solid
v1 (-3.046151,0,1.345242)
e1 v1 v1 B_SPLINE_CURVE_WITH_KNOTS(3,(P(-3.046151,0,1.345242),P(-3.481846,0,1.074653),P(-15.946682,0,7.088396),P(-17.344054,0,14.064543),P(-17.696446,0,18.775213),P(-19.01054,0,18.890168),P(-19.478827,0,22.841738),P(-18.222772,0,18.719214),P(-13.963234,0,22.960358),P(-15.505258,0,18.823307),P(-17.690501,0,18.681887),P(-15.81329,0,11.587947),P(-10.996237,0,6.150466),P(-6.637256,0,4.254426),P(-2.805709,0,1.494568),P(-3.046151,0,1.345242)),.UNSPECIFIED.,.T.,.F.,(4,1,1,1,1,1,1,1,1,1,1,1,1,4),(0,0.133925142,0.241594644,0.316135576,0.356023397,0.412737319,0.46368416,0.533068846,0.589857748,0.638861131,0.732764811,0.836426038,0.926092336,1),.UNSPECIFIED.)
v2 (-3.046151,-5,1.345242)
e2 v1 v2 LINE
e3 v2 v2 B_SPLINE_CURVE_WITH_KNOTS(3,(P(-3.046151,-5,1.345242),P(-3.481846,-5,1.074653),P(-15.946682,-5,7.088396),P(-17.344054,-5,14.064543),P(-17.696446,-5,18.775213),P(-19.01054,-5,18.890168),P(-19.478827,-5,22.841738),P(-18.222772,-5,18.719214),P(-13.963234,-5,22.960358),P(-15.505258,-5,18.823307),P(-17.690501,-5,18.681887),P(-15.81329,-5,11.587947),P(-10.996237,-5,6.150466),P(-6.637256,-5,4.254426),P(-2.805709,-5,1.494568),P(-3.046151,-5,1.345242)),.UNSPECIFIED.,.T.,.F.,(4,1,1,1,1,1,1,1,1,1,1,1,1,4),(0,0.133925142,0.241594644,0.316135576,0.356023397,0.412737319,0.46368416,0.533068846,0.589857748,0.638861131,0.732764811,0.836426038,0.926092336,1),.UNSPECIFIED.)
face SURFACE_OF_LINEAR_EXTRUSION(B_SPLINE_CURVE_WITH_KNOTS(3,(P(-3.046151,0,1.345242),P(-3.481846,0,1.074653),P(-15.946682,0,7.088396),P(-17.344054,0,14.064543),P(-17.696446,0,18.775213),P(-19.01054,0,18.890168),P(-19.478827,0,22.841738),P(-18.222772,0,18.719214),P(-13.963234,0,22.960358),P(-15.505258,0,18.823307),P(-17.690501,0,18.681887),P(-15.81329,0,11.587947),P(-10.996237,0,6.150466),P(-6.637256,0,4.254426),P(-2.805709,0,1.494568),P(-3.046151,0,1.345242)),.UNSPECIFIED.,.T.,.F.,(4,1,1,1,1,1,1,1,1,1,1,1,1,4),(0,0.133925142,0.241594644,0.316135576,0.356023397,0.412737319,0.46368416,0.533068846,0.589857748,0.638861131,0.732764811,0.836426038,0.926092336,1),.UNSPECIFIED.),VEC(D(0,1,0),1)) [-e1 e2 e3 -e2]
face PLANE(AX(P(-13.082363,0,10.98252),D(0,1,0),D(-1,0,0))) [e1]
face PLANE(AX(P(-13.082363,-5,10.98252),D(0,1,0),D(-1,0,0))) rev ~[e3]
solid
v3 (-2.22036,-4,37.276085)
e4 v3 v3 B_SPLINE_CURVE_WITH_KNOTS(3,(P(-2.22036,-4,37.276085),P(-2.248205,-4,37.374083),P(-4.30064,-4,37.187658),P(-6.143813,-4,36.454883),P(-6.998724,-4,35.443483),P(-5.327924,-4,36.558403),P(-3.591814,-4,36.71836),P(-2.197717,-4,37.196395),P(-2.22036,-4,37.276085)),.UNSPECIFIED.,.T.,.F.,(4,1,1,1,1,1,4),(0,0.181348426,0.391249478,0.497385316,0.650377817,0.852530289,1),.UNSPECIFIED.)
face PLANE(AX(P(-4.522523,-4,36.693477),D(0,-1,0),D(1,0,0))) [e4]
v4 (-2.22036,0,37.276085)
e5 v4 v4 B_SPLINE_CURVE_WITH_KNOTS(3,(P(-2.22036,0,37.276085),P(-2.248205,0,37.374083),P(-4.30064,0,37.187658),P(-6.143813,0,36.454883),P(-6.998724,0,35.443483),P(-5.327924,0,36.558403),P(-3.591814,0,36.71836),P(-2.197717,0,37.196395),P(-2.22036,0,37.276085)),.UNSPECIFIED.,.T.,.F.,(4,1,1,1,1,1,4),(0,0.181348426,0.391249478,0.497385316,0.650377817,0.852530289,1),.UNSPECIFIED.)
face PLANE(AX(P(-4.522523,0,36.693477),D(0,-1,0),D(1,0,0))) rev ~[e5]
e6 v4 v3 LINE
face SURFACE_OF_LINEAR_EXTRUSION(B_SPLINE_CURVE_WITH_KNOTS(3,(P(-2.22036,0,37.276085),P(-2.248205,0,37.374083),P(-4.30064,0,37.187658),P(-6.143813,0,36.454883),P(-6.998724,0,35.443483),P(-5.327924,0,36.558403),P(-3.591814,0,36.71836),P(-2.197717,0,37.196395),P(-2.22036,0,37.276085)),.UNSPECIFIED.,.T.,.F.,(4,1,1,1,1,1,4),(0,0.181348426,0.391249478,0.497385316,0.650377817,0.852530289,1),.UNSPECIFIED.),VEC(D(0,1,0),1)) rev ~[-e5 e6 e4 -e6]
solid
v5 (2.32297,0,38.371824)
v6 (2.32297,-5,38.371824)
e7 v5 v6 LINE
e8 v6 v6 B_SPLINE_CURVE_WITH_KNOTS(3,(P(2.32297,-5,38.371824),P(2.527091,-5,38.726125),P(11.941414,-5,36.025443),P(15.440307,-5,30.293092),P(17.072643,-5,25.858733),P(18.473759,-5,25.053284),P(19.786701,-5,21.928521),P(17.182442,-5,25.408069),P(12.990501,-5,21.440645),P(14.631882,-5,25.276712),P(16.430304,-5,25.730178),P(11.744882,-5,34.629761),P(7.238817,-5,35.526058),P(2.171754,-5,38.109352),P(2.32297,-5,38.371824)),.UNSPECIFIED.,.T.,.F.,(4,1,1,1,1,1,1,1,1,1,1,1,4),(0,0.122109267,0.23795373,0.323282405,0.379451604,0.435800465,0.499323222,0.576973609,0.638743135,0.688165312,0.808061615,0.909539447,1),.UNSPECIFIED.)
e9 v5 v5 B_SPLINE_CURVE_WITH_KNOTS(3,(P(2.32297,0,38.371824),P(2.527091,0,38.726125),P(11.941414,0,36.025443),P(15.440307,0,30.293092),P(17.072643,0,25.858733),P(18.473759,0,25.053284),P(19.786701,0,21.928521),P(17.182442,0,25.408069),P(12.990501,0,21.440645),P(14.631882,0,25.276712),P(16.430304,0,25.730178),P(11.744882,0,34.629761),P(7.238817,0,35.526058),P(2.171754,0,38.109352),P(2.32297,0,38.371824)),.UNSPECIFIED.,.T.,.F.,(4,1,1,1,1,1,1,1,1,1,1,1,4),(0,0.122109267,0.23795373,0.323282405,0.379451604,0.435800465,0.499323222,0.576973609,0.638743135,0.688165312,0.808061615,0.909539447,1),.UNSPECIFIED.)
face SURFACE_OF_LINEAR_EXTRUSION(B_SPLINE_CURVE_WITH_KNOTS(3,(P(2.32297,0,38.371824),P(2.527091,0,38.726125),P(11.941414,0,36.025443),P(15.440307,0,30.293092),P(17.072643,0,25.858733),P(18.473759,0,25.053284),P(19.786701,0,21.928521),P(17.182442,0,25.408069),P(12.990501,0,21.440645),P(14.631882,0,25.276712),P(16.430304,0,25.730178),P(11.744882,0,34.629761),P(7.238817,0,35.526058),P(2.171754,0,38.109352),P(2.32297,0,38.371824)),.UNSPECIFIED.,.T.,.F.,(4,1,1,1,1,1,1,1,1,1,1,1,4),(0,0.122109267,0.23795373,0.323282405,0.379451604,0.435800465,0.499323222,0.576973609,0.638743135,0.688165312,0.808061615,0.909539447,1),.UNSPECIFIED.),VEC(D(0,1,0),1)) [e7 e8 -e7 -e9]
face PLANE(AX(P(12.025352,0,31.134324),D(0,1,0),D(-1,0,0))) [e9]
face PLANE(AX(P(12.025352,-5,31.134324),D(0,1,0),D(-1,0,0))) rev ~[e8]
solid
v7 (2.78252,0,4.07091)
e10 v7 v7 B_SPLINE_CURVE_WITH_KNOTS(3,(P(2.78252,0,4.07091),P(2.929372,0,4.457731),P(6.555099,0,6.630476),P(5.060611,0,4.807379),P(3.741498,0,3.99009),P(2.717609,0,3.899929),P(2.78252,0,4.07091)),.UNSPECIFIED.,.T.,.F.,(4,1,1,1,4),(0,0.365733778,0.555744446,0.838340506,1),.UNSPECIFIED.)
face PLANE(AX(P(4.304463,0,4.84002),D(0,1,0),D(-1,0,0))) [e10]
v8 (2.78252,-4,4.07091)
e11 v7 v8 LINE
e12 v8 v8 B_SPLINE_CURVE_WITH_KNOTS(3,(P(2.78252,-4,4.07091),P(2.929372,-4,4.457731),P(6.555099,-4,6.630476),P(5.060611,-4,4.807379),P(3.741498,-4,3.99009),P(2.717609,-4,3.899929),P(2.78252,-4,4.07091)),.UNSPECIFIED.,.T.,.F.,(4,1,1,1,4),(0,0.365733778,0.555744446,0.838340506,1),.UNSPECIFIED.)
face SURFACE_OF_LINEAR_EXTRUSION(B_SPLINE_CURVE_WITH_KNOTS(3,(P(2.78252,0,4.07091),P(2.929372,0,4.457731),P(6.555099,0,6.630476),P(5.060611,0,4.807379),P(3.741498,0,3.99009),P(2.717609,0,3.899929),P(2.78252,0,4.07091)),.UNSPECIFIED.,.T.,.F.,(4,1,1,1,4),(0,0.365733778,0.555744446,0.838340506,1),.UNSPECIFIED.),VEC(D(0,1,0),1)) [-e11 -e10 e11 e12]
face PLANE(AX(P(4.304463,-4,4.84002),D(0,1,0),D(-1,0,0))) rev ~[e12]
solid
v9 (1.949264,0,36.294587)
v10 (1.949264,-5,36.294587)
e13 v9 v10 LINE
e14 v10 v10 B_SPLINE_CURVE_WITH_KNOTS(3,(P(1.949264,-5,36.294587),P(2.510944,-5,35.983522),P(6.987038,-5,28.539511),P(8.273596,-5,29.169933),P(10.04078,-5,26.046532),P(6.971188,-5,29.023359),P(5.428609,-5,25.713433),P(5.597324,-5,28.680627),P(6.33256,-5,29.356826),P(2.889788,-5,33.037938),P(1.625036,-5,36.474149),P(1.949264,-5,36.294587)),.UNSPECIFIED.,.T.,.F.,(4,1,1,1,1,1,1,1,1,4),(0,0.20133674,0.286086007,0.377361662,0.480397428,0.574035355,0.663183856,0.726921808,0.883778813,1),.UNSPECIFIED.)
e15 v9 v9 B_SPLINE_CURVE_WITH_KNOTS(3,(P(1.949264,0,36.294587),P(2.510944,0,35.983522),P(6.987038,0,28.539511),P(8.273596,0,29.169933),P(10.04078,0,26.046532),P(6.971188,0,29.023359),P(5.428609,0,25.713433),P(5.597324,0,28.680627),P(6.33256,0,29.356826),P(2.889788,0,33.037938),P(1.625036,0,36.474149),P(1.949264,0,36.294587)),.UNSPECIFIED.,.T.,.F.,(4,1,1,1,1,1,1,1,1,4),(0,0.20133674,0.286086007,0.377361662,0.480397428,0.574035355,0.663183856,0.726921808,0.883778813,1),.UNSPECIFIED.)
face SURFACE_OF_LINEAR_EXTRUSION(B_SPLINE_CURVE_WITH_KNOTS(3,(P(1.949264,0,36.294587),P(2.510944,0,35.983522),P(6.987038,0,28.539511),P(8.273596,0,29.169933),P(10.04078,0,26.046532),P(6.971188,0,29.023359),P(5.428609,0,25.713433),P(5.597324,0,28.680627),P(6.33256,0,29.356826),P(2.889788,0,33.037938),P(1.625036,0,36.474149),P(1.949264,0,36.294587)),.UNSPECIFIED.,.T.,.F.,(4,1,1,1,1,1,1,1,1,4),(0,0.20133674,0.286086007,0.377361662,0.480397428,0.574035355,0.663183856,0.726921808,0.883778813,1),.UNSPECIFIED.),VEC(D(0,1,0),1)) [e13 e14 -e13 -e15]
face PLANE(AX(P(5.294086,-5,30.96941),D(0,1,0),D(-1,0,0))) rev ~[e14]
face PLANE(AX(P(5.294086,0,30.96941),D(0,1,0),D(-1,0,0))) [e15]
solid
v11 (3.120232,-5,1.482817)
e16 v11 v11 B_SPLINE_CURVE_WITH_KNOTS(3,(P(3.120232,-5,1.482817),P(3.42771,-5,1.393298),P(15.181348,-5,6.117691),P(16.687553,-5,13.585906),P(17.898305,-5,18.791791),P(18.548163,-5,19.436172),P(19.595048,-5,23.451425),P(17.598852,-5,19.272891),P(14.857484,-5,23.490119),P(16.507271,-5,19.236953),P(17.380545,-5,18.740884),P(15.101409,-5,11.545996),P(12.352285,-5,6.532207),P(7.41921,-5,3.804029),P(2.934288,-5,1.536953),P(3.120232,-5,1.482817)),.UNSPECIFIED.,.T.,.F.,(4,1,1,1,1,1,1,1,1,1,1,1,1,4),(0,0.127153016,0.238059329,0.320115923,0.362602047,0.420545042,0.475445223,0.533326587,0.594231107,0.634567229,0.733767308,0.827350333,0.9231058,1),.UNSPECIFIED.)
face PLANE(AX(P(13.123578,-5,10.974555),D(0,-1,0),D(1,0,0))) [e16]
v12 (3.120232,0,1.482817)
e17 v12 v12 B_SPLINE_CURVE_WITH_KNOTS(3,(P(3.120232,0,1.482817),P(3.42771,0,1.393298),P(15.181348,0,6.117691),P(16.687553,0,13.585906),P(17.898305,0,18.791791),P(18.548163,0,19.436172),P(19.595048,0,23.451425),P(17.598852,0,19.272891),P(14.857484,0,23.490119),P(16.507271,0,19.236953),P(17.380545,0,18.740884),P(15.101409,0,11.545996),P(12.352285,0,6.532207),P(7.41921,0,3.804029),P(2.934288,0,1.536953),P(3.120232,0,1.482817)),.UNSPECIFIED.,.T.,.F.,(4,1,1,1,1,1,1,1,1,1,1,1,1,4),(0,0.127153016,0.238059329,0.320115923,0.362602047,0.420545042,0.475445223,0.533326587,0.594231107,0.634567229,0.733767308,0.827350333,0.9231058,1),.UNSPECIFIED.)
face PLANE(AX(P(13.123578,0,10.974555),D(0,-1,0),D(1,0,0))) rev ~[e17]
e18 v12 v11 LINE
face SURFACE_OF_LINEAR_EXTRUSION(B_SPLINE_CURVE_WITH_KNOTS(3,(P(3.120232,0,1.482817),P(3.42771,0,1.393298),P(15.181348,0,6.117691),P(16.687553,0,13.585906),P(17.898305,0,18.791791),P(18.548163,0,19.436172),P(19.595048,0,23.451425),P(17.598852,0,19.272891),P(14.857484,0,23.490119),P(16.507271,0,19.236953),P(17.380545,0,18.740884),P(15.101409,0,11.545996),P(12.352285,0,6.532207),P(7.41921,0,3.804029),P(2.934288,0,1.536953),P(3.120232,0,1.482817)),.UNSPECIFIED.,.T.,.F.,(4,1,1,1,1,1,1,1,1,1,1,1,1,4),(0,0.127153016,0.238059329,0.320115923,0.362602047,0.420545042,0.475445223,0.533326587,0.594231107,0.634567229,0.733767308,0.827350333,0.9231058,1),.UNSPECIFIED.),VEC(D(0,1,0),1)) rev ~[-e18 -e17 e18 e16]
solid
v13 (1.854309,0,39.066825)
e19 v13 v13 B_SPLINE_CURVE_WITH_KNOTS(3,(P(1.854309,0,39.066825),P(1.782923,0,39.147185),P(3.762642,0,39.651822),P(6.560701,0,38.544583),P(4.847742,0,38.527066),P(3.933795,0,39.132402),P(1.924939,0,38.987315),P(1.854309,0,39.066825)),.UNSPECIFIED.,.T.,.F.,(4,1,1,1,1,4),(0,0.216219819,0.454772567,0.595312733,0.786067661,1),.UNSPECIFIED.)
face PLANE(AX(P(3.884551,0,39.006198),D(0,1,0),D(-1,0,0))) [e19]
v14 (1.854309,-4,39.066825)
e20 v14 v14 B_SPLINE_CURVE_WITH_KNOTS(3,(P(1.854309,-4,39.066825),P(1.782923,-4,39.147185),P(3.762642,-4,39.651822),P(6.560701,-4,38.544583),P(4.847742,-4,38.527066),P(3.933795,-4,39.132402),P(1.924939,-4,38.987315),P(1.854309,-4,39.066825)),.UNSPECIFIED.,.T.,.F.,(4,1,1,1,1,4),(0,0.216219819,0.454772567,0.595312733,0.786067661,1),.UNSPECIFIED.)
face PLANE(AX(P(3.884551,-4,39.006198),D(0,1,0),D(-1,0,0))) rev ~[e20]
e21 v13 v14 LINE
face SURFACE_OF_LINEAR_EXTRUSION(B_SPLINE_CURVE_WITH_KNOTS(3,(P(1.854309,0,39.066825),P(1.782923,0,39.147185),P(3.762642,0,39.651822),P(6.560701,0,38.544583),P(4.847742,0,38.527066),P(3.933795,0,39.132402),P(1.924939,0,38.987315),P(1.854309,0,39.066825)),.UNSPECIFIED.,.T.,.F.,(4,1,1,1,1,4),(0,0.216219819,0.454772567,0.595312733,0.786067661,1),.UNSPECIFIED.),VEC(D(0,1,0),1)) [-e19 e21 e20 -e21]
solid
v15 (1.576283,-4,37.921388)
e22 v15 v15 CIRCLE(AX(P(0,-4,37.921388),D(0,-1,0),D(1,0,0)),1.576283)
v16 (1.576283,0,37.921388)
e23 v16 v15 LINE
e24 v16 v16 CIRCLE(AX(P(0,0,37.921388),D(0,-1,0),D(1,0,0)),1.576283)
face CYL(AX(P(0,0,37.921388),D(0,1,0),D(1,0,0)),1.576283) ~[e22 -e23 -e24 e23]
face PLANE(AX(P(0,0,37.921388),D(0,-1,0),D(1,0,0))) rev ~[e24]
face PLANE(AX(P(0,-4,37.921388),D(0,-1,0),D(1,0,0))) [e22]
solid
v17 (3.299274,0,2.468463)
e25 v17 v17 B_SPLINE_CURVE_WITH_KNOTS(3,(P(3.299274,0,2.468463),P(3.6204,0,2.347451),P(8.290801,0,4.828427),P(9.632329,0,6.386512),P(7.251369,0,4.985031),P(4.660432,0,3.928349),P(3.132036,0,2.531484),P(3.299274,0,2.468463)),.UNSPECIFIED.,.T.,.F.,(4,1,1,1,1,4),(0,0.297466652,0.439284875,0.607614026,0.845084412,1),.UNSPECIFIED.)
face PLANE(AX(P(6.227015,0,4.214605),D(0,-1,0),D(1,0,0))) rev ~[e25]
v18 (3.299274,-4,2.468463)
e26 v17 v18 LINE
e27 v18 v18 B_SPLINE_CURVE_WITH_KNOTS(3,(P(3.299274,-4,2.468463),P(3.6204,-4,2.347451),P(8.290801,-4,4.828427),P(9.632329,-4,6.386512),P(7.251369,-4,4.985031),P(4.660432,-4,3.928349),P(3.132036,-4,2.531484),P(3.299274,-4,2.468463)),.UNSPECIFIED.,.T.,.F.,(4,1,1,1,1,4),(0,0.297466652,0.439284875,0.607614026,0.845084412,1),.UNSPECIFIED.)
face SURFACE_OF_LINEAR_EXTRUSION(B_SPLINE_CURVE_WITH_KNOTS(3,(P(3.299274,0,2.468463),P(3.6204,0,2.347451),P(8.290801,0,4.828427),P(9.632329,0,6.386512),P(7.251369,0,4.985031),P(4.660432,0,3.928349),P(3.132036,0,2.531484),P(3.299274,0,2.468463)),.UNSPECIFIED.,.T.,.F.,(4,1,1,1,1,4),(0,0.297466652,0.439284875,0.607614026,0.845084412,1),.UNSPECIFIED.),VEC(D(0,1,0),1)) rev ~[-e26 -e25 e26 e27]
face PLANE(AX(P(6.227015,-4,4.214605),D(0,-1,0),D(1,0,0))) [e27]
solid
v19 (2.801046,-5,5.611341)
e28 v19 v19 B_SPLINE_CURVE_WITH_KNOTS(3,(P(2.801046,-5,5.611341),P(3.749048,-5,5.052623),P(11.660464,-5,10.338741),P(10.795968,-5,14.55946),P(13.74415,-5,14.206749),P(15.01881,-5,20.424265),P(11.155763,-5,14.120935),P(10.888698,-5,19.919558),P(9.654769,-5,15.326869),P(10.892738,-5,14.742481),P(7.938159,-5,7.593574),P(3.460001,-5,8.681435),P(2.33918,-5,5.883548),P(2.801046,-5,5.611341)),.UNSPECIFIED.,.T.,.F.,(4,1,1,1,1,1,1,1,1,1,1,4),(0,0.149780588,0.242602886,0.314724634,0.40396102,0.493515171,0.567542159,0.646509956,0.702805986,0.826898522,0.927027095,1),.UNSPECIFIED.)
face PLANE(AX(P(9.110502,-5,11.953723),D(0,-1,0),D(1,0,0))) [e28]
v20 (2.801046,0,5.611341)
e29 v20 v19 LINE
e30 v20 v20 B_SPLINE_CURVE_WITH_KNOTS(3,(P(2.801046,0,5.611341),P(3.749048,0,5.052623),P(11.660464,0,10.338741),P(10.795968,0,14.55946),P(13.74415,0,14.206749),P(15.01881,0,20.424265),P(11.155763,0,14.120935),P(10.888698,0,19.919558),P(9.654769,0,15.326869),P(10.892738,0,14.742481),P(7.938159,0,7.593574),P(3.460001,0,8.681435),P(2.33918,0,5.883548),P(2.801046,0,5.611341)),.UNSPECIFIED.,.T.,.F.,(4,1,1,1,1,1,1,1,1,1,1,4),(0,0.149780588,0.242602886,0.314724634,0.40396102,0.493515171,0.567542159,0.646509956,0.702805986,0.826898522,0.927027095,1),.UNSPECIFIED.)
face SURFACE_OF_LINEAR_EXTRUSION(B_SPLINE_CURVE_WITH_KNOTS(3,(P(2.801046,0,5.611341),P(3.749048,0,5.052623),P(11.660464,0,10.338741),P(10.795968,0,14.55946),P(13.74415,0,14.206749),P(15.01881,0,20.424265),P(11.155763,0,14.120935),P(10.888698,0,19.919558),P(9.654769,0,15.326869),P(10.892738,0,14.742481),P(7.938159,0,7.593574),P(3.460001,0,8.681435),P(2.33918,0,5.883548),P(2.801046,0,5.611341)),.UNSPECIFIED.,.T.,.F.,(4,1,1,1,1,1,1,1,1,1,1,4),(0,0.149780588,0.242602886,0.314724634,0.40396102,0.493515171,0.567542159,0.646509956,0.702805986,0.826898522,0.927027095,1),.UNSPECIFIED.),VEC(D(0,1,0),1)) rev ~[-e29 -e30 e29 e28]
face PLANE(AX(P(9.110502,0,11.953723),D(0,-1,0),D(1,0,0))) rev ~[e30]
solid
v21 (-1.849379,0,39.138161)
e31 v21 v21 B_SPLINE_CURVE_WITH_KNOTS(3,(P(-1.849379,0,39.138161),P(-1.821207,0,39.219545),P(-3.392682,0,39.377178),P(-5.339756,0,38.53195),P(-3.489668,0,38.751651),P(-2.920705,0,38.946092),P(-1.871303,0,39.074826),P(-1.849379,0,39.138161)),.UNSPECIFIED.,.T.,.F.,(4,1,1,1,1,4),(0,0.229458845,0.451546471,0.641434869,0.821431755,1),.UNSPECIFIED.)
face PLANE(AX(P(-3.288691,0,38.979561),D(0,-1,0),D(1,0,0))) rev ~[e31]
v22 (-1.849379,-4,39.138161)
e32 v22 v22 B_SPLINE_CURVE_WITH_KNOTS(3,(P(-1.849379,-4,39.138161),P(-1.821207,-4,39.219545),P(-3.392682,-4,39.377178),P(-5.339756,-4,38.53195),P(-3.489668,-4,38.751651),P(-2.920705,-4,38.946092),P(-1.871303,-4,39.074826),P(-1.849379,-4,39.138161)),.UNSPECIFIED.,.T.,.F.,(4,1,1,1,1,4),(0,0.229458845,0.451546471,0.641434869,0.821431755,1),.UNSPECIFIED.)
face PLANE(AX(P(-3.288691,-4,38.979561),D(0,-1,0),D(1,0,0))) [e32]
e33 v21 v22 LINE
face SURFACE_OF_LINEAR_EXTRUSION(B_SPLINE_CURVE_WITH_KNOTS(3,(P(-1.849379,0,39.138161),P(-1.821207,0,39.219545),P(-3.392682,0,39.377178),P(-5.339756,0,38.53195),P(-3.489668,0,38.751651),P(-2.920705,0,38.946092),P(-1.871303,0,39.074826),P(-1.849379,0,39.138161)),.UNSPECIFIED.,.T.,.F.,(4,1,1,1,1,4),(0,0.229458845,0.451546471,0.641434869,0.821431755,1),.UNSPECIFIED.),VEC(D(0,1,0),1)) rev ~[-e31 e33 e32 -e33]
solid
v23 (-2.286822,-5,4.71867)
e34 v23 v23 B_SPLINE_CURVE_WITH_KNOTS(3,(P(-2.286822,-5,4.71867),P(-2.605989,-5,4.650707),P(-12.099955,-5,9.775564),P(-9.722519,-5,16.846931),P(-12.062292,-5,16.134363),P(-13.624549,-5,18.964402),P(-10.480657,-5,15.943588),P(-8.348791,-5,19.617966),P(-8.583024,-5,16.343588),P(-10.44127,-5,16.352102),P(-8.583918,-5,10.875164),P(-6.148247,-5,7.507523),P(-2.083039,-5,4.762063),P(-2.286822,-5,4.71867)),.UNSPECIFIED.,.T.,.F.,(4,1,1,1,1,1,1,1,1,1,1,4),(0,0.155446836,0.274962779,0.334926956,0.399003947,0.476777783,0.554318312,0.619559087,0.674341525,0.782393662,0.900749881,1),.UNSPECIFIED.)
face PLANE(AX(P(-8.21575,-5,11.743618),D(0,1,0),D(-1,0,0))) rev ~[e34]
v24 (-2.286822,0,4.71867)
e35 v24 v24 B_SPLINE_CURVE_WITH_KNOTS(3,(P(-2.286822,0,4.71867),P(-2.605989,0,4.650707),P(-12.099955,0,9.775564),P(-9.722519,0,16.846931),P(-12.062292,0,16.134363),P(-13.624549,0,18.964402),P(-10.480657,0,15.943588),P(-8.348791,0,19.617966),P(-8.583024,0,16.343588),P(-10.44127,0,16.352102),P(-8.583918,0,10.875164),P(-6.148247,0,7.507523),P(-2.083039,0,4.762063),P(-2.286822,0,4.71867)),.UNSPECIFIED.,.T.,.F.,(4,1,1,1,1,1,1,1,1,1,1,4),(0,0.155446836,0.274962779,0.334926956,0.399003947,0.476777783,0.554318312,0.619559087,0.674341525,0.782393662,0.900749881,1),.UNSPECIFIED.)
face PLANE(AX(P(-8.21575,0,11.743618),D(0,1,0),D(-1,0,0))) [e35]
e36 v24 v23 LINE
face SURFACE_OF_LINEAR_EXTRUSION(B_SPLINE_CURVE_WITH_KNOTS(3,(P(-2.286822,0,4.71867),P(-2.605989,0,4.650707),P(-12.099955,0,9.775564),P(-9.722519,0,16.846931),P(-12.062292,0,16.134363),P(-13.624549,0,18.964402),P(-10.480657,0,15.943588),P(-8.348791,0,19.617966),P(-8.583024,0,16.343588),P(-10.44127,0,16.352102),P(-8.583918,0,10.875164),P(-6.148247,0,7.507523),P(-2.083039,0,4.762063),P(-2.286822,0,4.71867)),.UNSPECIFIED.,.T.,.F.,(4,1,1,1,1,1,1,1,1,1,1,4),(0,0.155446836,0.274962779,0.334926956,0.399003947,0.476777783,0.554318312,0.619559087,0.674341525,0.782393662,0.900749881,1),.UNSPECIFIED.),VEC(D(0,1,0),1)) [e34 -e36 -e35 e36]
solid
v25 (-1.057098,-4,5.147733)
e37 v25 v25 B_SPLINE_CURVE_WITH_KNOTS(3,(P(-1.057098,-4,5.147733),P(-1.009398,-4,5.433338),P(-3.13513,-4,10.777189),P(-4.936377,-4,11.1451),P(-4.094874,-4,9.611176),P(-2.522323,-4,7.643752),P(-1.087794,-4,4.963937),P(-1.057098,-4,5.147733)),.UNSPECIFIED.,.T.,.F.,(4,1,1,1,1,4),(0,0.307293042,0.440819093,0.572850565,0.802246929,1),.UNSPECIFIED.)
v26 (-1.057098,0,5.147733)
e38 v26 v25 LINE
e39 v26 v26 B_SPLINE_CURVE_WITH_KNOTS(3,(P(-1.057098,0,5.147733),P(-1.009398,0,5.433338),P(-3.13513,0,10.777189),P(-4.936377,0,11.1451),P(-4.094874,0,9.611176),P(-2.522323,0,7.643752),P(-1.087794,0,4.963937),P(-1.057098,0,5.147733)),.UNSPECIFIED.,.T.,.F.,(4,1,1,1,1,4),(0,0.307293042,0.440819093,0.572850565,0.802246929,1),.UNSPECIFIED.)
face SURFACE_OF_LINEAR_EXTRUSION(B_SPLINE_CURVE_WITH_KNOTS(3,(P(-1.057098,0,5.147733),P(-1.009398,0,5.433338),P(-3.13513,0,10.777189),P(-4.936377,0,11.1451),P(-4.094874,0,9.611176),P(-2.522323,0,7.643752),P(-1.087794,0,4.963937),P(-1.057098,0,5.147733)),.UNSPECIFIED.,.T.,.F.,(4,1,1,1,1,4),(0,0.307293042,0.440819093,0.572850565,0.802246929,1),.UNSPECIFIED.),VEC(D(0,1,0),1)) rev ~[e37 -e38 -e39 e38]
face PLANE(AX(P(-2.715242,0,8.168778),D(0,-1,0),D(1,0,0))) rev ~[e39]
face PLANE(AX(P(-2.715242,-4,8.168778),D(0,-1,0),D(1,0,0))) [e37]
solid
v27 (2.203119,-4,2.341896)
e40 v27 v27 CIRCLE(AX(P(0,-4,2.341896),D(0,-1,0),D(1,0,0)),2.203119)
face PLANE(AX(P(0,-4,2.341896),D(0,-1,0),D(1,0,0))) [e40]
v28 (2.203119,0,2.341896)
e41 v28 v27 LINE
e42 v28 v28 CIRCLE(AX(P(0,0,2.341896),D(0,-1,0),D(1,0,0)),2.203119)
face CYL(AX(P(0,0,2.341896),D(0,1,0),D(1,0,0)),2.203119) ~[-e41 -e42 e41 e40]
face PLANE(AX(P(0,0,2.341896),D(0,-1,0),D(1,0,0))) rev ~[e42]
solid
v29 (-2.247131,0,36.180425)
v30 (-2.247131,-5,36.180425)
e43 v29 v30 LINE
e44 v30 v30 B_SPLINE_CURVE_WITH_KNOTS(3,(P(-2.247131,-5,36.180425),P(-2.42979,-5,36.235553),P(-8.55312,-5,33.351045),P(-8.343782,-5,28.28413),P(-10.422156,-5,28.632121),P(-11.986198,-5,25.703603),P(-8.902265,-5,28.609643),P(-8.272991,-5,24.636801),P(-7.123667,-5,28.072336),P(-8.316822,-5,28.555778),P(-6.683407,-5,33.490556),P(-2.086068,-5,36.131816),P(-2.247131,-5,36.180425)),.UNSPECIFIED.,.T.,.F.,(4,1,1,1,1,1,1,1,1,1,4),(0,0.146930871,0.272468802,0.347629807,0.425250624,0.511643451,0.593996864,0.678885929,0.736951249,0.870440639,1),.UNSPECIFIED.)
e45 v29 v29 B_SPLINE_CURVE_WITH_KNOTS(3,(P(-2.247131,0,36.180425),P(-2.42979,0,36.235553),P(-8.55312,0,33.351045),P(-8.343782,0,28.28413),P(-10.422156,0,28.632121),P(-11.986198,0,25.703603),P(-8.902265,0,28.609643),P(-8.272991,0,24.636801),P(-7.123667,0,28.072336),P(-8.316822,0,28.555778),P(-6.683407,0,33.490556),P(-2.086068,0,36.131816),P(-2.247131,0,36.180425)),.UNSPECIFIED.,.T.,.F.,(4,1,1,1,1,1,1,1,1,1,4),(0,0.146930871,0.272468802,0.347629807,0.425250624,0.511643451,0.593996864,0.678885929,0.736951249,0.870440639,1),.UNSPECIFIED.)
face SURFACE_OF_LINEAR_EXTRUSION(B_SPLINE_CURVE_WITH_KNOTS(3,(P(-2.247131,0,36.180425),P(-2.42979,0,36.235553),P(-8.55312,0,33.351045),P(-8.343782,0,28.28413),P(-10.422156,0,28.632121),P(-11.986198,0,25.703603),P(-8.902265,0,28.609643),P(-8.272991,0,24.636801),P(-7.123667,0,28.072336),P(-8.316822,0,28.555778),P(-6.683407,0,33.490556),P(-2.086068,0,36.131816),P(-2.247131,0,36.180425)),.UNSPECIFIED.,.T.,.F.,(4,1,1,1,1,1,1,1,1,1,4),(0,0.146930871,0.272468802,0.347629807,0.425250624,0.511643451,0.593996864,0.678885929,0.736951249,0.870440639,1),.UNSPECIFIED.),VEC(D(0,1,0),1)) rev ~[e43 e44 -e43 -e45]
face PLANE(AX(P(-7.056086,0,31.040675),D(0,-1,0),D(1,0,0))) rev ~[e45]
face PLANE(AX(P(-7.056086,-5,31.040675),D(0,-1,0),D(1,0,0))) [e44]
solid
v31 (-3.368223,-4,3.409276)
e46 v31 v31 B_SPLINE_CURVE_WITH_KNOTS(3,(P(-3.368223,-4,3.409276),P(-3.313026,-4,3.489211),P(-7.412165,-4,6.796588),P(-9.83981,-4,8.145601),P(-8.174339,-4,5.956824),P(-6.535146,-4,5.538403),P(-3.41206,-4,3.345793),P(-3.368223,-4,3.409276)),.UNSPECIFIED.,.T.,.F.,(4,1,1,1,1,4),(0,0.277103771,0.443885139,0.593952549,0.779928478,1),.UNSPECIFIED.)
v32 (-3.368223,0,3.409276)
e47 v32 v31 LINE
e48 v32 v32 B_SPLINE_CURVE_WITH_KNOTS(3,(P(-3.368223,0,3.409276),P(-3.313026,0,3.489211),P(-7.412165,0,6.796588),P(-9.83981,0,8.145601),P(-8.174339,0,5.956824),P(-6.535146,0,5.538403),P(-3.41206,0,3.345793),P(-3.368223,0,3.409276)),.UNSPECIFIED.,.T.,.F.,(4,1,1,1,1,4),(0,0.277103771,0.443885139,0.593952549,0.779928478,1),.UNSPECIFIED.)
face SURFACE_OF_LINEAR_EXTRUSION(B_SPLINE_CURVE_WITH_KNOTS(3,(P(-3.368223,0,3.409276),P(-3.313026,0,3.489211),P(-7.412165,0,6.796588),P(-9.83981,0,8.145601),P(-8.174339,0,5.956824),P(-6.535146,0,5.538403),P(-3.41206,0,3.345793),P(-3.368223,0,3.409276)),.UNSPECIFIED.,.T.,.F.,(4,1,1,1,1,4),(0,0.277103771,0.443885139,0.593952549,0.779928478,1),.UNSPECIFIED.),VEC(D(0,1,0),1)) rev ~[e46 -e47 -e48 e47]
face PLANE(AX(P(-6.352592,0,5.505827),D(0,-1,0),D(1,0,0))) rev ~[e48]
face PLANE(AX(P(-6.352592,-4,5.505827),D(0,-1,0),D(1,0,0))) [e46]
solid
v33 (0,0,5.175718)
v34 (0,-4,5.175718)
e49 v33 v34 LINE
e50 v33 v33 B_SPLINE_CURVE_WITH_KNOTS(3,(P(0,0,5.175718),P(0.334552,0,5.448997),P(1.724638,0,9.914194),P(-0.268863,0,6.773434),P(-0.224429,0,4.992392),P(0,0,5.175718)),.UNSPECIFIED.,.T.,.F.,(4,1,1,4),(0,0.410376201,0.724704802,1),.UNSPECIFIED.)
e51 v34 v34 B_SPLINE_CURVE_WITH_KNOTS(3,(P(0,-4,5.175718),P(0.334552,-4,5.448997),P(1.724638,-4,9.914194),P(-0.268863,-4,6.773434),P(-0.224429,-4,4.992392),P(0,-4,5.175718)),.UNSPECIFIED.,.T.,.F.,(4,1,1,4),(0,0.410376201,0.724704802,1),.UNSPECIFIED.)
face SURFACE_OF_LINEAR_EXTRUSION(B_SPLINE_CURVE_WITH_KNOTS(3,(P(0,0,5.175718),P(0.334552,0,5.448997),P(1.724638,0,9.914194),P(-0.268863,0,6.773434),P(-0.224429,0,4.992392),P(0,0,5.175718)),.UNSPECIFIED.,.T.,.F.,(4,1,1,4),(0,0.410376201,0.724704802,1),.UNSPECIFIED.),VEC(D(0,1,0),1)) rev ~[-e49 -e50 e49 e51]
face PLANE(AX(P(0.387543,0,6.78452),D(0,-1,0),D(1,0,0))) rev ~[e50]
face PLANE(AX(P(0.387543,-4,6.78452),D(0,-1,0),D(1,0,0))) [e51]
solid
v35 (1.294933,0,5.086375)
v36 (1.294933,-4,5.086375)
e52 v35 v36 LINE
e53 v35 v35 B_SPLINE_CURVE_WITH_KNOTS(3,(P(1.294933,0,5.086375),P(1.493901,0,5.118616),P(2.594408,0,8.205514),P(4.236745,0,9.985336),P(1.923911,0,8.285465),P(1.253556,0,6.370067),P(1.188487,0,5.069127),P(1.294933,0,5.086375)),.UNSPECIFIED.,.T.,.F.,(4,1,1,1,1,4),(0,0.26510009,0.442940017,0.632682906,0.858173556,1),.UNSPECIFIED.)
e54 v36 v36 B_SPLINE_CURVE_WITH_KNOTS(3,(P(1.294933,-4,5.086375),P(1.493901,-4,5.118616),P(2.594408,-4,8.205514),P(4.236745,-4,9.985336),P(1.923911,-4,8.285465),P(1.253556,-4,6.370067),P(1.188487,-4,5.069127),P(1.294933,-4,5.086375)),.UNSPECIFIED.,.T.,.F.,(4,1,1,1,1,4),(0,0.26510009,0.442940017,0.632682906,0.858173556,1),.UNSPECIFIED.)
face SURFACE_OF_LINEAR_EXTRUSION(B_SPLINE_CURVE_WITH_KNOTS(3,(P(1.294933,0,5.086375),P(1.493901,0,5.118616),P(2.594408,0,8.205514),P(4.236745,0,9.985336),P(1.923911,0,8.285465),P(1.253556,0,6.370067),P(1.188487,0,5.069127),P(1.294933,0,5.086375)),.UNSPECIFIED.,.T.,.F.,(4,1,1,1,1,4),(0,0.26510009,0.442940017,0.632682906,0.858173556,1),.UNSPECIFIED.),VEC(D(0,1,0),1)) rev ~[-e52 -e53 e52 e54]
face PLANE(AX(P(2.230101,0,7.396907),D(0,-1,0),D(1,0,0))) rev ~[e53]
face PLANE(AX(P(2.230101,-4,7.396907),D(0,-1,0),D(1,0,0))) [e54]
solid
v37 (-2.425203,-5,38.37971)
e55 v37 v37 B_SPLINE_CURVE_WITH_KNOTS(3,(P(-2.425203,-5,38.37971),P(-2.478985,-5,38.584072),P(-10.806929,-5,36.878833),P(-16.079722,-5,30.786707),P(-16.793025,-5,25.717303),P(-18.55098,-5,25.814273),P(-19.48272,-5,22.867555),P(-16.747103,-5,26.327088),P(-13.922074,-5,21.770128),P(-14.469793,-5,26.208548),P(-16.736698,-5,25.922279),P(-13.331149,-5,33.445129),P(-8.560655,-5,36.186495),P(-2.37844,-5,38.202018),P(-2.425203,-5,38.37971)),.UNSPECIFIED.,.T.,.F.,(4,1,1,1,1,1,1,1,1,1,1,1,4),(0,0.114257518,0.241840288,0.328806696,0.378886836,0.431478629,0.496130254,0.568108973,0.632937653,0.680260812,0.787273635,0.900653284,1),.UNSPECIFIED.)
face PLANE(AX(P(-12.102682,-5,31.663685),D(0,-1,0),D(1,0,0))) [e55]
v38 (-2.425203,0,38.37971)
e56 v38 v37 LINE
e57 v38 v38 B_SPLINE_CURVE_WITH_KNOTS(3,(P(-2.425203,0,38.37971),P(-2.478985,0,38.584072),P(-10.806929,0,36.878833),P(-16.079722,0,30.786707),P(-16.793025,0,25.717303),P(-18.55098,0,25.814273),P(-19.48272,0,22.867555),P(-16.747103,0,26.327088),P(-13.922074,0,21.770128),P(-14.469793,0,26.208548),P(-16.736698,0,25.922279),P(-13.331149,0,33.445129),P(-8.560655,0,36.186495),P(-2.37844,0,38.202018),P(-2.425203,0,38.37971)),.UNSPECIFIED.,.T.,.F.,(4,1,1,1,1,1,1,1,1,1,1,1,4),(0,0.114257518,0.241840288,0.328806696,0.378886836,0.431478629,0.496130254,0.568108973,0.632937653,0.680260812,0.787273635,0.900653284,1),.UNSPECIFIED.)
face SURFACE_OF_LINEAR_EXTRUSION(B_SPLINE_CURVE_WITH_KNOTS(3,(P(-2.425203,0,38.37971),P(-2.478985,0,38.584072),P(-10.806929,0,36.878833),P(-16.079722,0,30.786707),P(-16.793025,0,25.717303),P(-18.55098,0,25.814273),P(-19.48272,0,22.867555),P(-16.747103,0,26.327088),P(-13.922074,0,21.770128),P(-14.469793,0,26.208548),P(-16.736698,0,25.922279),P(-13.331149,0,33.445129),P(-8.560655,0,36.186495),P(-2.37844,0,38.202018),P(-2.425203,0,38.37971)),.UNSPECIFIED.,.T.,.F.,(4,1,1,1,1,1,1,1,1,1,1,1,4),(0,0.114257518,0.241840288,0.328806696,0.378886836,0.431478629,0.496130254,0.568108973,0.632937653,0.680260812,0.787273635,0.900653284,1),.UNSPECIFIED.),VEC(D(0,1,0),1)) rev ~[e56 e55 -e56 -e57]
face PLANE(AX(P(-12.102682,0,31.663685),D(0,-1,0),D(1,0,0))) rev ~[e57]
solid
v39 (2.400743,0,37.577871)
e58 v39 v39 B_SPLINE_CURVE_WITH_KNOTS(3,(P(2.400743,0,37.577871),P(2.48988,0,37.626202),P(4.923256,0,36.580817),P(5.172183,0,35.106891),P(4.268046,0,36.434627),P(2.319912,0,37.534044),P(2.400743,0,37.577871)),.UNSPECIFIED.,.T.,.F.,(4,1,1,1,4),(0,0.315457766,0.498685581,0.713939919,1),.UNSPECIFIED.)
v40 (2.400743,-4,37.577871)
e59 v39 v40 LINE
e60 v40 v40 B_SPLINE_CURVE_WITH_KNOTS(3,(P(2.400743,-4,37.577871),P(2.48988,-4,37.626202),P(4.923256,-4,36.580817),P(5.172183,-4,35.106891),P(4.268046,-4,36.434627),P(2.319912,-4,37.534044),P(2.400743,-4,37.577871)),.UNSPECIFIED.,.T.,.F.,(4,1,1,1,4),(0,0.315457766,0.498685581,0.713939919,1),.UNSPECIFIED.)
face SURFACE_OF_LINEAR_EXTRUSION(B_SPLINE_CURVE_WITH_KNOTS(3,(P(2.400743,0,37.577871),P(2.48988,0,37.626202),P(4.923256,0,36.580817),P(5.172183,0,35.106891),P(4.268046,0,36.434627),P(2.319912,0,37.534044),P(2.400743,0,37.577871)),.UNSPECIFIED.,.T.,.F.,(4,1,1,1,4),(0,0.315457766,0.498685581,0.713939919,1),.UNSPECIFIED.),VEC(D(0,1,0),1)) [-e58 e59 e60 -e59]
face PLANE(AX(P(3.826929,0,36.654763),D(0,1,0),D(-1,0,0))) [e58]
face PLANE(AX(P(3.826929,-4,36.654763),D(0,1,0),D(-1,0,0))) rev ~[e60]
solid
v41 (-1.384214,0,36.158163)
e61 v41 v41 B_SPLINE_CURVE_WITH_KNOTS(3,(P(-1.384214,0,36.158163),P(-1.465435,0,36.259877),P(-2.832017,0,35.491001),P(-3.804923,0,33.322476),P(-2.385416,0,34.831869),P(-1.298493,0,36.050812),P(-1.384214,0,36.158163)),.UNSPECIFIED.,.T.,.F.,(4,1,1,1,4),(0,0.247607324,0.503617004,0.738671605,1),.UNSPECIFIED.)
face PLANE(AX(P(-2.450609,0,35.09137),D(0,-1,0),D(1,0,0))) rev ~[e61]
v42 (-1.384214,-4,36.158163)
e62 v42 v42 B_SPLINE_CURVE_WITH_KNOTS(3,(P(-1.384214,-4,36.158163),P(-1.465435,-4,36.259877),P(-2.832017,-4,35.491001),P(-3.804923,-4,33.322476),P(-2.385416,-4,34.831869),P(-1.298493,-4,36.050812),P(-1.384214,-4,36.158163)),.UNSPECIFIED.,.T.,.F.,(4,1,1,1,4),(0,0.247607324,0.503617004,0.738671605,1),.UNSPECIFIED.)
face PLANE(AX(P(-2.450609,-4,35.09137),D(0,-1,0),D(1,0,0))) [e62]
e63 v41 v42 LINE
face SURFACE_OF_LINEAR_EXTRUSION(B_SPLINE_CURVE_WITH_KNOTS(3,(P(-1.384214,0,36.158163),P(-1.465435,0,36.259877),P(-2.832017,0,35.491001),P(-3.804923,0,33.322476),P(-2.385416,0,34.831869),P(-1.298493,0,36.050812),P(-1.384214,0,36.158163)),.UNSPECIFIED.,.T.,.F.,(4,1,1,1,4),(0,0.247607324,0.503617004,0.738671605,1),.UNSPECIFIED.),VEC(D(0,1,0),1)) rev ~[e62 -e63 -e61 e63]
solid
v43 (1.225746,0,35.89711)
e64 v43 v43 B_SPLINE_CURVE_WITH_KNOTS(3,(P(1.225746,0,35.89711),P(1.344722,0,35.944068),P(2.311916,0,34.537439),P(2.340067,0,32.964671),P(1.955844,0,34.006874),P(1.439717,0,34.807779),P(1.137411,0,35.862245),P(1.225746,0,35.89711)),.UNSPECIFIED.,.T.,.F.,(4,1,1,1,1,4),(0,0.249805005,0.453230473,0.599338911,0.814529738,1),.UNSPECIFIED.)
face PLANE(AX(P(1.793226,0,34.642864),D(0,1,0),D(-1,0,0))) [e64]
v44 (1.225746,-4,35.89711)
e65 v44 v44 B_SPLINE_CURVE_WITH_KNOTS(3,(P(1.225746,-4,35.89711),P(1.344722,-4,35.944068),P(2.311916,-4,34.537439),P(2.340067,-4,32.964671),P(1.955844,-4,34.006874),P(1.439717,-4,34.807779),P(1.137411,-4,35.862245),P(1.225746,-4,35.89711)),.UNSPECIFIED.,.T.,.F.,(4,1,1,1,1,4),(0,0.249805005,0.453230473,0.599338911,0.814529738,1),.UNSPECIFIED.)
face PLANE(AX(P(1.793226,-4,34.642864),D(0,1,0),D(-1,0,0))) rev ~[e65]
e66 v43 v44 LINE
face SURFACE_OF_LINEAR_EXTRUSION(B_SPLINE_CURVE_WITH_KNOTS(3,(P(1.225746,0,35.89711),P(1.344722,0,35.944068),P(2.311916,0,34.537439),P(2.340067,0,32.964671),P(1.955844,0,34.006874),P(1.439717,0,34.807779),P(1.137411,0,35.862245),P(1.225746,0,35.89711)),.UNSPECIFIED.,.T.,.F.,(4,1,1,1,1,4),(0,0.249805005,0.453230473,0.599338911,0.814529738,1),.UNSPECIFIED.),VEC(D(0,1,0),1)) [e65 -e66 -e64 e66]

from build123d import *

# Parameters (mm, degrees)
F3_R      = 2.2031193739
F4_DEPTH  = 4
F5_R      = 1.5762828789
F6_DEPTH  = 4
F8_DEPTH  = 5
F13_DEPTH = 5
F14_DEPTH = 5
F15_DEPTH = 5
F19_DEPTH = 5
F20_DEPTH = 5
F21_DEPTH = 5
F22_DEPTH = 5
F29_DEPTH = 4
F30_DEPTH = 4
F31_DEPTH = 4
F32_DEPTH = 4
F33_DEPTH = 4
F34_DEPTH = 4
F39_DEPTH = 4
F40_DEPTH = 4
F41_DEPTH = 4
F42_DEPTH = 4
F45_DEPTH = 4
F46_DEPTH = 4


# Not quite as in the source:
# - the program builds the solid bodies; features that only make, move or delete a surface that nothing else refers to are left out


with BuildPart() as f4:
    # F3 (on Front) → F4 (new body)
    with BuildSketch(Plane.XZ):
        with Locations((0, 2.3418962955)):
            Circle(F3_R)
    extrude(amount=F4_DEPTH)


with BuildPart() as f6:
    # F5 (on Front) → F6 (new body)
    with BuildSketch(Plane.XZ):
        with Locations((0, 37.9213877022)):
            Circle(F5_R)
    extrude(amount=F6_DEPTH)


with BuildPart() as f8:
    # F7 (on Front) → F8 (new body)
    with BuildSketch(Plane.XZ):
        with BuildLine():
            add(Edge.make_bspline(
                [(2.8010457754, 5.6113414466), (3.7490480342, 5.0526232335), (11.660464427, 10.3387411352), (10.7959679961, 14.559460332), (13.7441495824, 14.2067494477), (15.0188095178, 20.4242651347), (11.155763458, 14.1209353977), (10.8886984205, 19.9195584963), (9.6547685549, 15.3268691163), (10.8927378391, 14.7424811012), (7.938159407, 7.593573555), (3.4600012996, 8.6814348962), (2.339180326, 5.8835482227), (2.8010457754, 5.6113414466)],
                knots=[0, 0, 0, 0, 0.1497805879, 0.2426028863, 0.3147246339, 0.4039610203, 0.4935151706, 0.5675421593, 0.6465099561, 0.7028059861, 0.826898522, 0.9270270952, 1, 1, 1, 1], degree=3))
        make_face()
    extrude(amount=F8_DEPTH)


with BuildPart() as f13:
    # F10 (on Front) → F13 (new body)
    with BuildSketch(Plane.XZ):
        with BuildLine():
            add(Edge.make_bspline(
                [(-3.0461507849, 1.3452416752), (-3.4818464728, 1.0746526722), (-15.9466824959, 7.0883957863), (-17.3440535719, 14.0645430033), (-17.6964457302, 18.7752133758), (-19.0105397095, 18.8901683902), (-19.4788265599, 22.8417380605), (-18.2227719071, 18.7192140814), (-13.9632338729, 22.9603577053), (-15.5052584544, 18.8233068375), (-17.6905007654, 18.6818873374), (-15.8132900001, 11.5879474918), (-10.9962366401, 6.1504658227), (-6.6372556078, 4.254425972), (-2.8057086264, 1.4945683859), (-3.0461507849, 1.3452416752)],
                knots=[0, 0, 0, 0, 0.1339251424, 0.241594644, 0.3161355758, 0.3560233968, 0.412737319, 0.4636841603, 0.5330688457, 0.5898577481, 0.638861131, 0.7327648109, 0.8364260377, 0.9260923364, 1, 1, 1, 1], degree=3))
        make_face()
    extrude(amount=F13_DEPTH)


with BuildPart() as f14:
    # F11 (on Front) → F14 (new body)
    with BuildSketch(Plane.XZ):
        with BuildLine():
            add(Edge.make_bspline(
                [(-2.2868220694, 4.7186701559), (-2.6059892866, 4.6507073984), (-12.0999546825, 9.7755638468), (-9.7225185843, 16.8469305379), (-12.0622915375, 16.1343630453), (-13.6245494081, 18.964401828), (-10.4806569975, 15.9435882622), (-8.3487910491, 19.617965915), (-8.5830237681, 16.343588236), (-10.4412698192, 16.3521021675), (-8.5839180053, 10.8751642204), (-6.1482469705, 7.5075225049), (-2.0830393164, 4.7620632021), (-2.2868220694, 4.7186701559)],
                knots=[0, 0, 0, 0, 0.1554468363, 0.2749627788, 0.3349269565, 0.3990039473, 0.4767777833, 0.5543183117, 0.6195590867, 0.6743415246, 0.7823936617, 0.9007498811, 1, 1, 1, 1], degree=3))
        make_face()
    extrude(amount=F14_DEPTH)


with BuildPart() as f15:
    # F12 (on Front) → F15 (new body)
    with BuildSketch(Plane.XZ):
        with BuildLine():
            add(Edge.make_bspline(
                [(3.1202319078, 1.4828173444), (3.4277099811, 1.3932976165), (15.1813481771, 6.1176914834), (16.6875533637, 13.5859063631), (17.8983054266, 18.7917910272), (18.5481634415, 19.4361719166), (19.5950481907, 23.4514253732), (17.598851761, 19.2728908312), (14.8574838152, 23.4901190525), (16.5072711493, 19.2369526839), (17.3805448102, 18.7408839057), (15.1014088235, 11.5459960258), (12.3522853152, 6.5322070241), (7.4192099097, 3.8040285678), (2.9342883779, 1.5369532833), (3.1202319078, 1.4828173444)],
                knots=[0, 0, 0, 0, 0.1271530156, 0.2380593294, 0.3201159226, 0.3626020469, 0.4205450423, 0.4754452226, 0.533326587, 0.5942311074, 0.6345672285, 0.7337673076, 0.8273503335, 0.9231057997, 1, 1, 1, 1], degree=3))
        make_face()
    extrude(amount=F15_DEPTH)


with BuildPart() as f19:
    # F18 (on Front) → F19 (new body)
    with BuildSketch(Plane.XZ):
        with BuildLine():
            add(Edge.make_bspline(
                [(2.322970191, 38.3718237281), (2.5270910425, 38.7261250095), (11.9414135575, 36.0254427021), (15.4403073522, 30.293092001), (17.0726428574, 25.8587327004), (18.4737587842, 25.0532840335), (19.7867006527, 21.928521176), (17.1824421043, 25.4080690427), (12.990501005, 21.4406454045), (14.6318823595, 25.2767119865), (16.4303038149, 25.7301784196), (11.7448821367, 34.6297607631), (7.2388170198, 35.5260575644), (2.1717541082, 38.1093515136), (2.322970191, 38.3718237281)],
                knots=[0, 0, 0, 0, 0.1221092671, 0.2379537302, 0.323282405, 0.3794516036, 0.4358004654, 0.4993232222, 0.5769736094, 0.6387431351, 0.688165312, 0.8080616155, 0.9095394473, 1, 1, 1, 1], degree=3))
        make_face()
    extrude(amount=F19_DEPTH)


with BuildPart() as f20:
    # F17 (on Front) → F20 (new body)
    with BuildSketch(Plane.XZ):
        with BuildLine():
            add(Edge.make_bspline(
                [(1.9492642023, 36.2945869565), (2.5109444115, 35.9835217607), (6.9870378528, 28.5395111667), (8.2735961106, 29.1699334606), (10.0407799206, 26.0465320892), (6.971187526, 29.0233585074), (5.4286092857, 25.7134326681), (5.5973243084, 28.6806268497), (6.3325602319, 29.3568256566), (2.8897882043, 33.0379384873), (1.6250355459, 36.4741486516), (1.9492642023, 36.2945869565)],
                knots=[0, 0, 0, 0, 0.2013367397, 0.2860860069, 0.3773616619, 0.480397428, 0.5740353547, 0.6631838563, 0.7269218084, 0.8837788131, 1, 1, 1, 1], degree=3))
        make_face()
    extrude(amount=F20_DEPTH)


with BuildPart() as f21:
    # F16 (on Front) → F21 (new body)
    with BuildSketch(Plane.XZ):
        with BuildLine():
            add(Edge.make_bspline(
                [(-2.4252030998, 38.3797101676), (-2.4789846343, 38.5840722079), (-10.8069291148, 36.8788326973), (-16.0797222373, 30.7867074955), (-16.7930252537, 25.7173030694), (-18.5509802615, 25.8142728569), (-19.4827202682, 22.8675548903), (-16.7471027116, 26.3270879047), (-13.9220735744, 21.7701284075), (-14.4697933803, 26.2085478406), (-16.7366984942, 25.9222789509), (-13.3311489117, 33.4451286462), (-8.560655082, 36.1864951779), (-2.3784401481, 38.2020177249), (-2.4252030998, 38.3797101676)],
                knots=[0, 0, 0, 0, 0.1142575183, 0.2418402879, 0.3288066955, 0.3788868359, 0.4314786293, 0.4961302535, 0.5681089731, 0.6329376534, 0.6802608121, 0.787273635, 0.9006532842, 1, 1, 1, 1], degree=3))
        make_face()
    extrude(amount=F21_DEPTH)


with BuildPart() as f22:
    # F9 (on Front) → F22 (new body)
    with BuildSketch(Plane.XZ):
        with BuildLine():
            add(Edge.make_bspline(
                [(-2.2471314296, 36.1804254353), (-2.4297902392, 36.2355529609), (-8.5531195322, 33.3510451306), (-8.3437817698, 28.2841304607), (-10.4221559056, 28.6321210069), (-11.986198059, 25.7036030989), (-8.902264517, 28.6096428837), (-8.2729905956, 24.6368009538), (-7.1236667489, 28.0723362786), (-8.3168221546, 28.5557775169), (-6.683407476, 33.4905561644), (-2.0860682132, 36.1318155894), (-2.2471314296, 36.1804254353)],
                knots=[0, 0, 0, 0, 0.1469308705, 0.2724688016, 0.3476298065, 0.4252506236, 0.5116434508, 0.5939968645, 0.6788859293, 0.7369512488, 0.8704406393, 1, 1, 1, 1], degree=3))
        make_face()
    extrude(amount=F22_DEPTH)


with BuildPart() as f29:
    # F25 (on Front) → F29 (new body)
    with BuildSketch(Plane.XZ):
        with BuildLine():
            add(Edge.make_bspline(
                [(-1.8493793905, 39.138160646), (-1.8212072767, 39.2195451719), (-3.3926815622, 39.3771778296), (-5.3397557879, 38.5319502967), (-3.4896675647, 38.7516512444), (-2.9207049201, 38.9460915409), (-1.8713033434, 39.0748260119), (-1.8493793905, 39.138160646)],
                knots=[0, 0, 0, 0, 0.229458845, 0.4515464705, 0.6414348687, 0.8214317548, 1, 1, 1, 1], degree=3))
        make_face()
    extrude(amount=F29_DEPTH)


with BuildPart() as f30:
    # F26 (on Front) → F30 (new body)
    with BuildSketch(Plane.XZ):
        with BuildLine():
            add(Edge.make_bspline(
                [(-2.2203600965, 37.2760854661), (-2.2482048938, 37.3740834609), (-4.3006399089, 37.1876575574), (-6.1438132913, 36.4548829278), (-6.9987236159, 35.4434833858), (-5.3279235742, 36.5584028629), (-3.5918143504, 36.7183597714), (-2.1977171419, 37.196395026), (-2.2203600965, 37.2760854661)],
                knots=[0, 0, 0, 0, 0.1813484263, 0.3912494782, 0.4973853163, 0.650377817, 0.8525302895, 1, 1, 1, 1], degree=3))
        make_face()
    extrude(amount=F30_DEPTH)


with BuildPart() as f31:
    # F27 (on Front) → F31 (new body)
    with BuildSketch(Plane.XZ):
        with BuildLine():
            add(Edge.make_bspline(
                [(-1.3842144981, 36.1581631005), (-1.4654348488, 36.2598773586), (-2.8320166984, 35.4910009057), (-3.8049234588, 33.3224757949), (-2.3854156249, 34.8318687171), (-1.2984933507, 36.0508123832), (-1.3842144981, 36.1581631005)],
                knots=[0, 0, 0, 0, 0.247607324, 0.5036170042, 0.7386716047, 1, 1, 1, 1], degree=3))
        make_face()
    extrude(amount=F31_DEPTH)


with BuildPart() as f32:
    # F24 (on Front) → F32 (new body)
    with BuildSketch(Plane.XZ):
        with BuildLine():
            add(Edge.make_bspline(
                [(1.2257457711, 35.8971096575), (1.3447218931, 35.9440675201), (2.3119158995, 34.5374387809), (2.3400667486, 32.9646713994), (1.9558439298, 34.006873836), (1.439716885, 34.8077793744), (1.1374107412, 35.8622453156), (1.2257457711, 35.8971096575)],
                knots=[0, 0, 0, 0, 0.2498050049, 0.4532304733, 0.5993389115, 0.8145297375, 1, 1, 1, 1], degree=3))
        make_face()
    extrude(amount=F32_DEPTH)


with BuildPart() as f33:
    # F28 (on Front) → F33 (new body)
    with BuildSketch(Plane.XZ):
        with BuildLine():
            add(Edge.make_bspline(
                [(1.854308648, 39.066825062), (1.7829226729, 39.1471854731), (3.7626423728, 39.6518215727), (6.5607006963, 38.5445827834), (4.8477423703, 38.5270656292), (3.9337949577, 39.1324017282), (1.9249394007, 38.9873148177), (1.854308648, 39.066825062)],
                knots=[0, 0, 0, 0, 0.2162198195, 0.4547725674, 0.5953127328, 0.7860676614, 1, 1, 1, 1], degree=3))
        make_face()
    extrude(amount=F33_DEPTH)


with BuildPart() as f34:
    # F23 (on Front) → F34 (new body)
    with BuildSketch(Plane.XZ):
        with BuildLine():
            add(Edge.make_bspline(
                [(2.4007428437, 37.5778712332), (2.4898800691, 37.6262023146), (4.923256046, 36.5808170939), (5.1721828368, 35.106890813), (4.2680461742, 36.4346272144), (2.3199123661, 37.5340441523), (2.4007428437, 37.5778712332)],
                knots=[0, 0, 0, 0, 0.3154577662, 0.4986855814, 0.7139399188, 1, 1, 1, 1], degree=3))
        make_face()
    extrude(amount=F34_DEPTH)


with BuildPart() as f39:
    # F38 (on Front) → F39 (new body)
    with BuildSketch(Plane.XZ):
        with BuildLine():
            add(Edge.make_bspline(
                [(-1.0570976883, 5.1477327943), (-1.0093984648, 5.4333380409), (-3.1351298314, 10.7771894873), (-4.936376624, 11.1450995172), (-4.0948741306, 9.6111760638), (-2.5223229035, 7.6437517034), (-1.0877936906, 4.9639365255), (-1.0570976883, 5.1477327943)],
                knots=[0, 0, 0, 0, 0.3072930417, 0.4408190935, 0.5728505652, 0.8022469295, 1, 1, 1, 1], degree=3))
        make_face()
    extrude(amount=F39_DEPTH)


with BuildPart() as f40:
    # F37 (on Front) → F40 (new body)
    with BuildSketch(Plane.XZ):
        with BuildLine():
            add(Edge.make_bspline(
                [(1.2949332595, 5.0863754004), (1.4939007591, 5.1186163463), (2.5944083027, 8.205514), (4.2367450306, 9.9853359657), (1.923911231, 8.2854649724), (1.2535563048, 6.3700668464), (1.1884872267, 5.0691267503), (1.2949332595, 5.0863754004)],
                knots=[0, 0, 0, 0, 0.2651000904, 0.442940017, 0.6326829059, 0.8581735562, 1, 1, 1, 1], degree=3))
        make_face()
    extrude(amount=F40_DEPTH)


with BuildPart() as f41:
    # F35 (on Front) → F41 (new body)
    with BuildSketch(Plane.XZ):
        with BuildLine():
            add(Edge.make_bspline(
                [(3.2992735505, 2.4684630334), (3.6204000545, 2.3474509242), (8.2908014988, 4.8284273099), (9.6323287724, 6.3865119684), (7.2513691654, 4.9850305086), (4.6604319274, 3.9283494495), (3.1320363131, 2.5314840877), (3.2992735505, 2.4684630334)],
                knots=[0, 0, 0, 0, 0.2974666521, 0.4392848746, 0.6076140264, 0.8450844122, 1, 1, 1, 1], degree=3))
        make_face()
    extrude(amount=F41_DEPTH)


with BuildPart() as f42:
    # F36 (on Front) → F42 (new body)
    with BuildSketch(Plane.XZ):
        with BuildLine():
            add(Edge.make_bspline(
                [(-3.368223086, 3.4092757851), (-3.3130259817, 3.4892108713), (-7.4121647777, 6.7965884216), (-9.8398102074, 8.1456007912), (-8.1743390146, 5.9568237641), (-6.5351459029, 5.5384033726), (-3.4120597712, 3.3457925779), (-3.368223086, 3.4092757851)],
                knots=[0, 0, 0, 0, 0.2771037709, 0.4438851386, 0.5939525495, 0.7799284778, 1, 1, 1, 1], degree=3))
        make_face()
    extrude(amount=F42_DEPTH)


with BuildPart() as f45:
    # F44 (on Front) → F45 (new body)
    with BuildSketch(Plane.XZ):
        with BuildLine():
            add(Edge.make_bspline(
                [(2.7825199068, 4.0709096938), (2.9293722277, 4.4577308107), (6.5550985197, 6.6304764507), (5.0606111558, 4.8073786471), (3.741498474, 3.9900895749), (2.7176091072, 3.8999292979), (2.7825199068, 4.0709096938)],
                knots=[0, 0, 0, 0, 0.3657337783, 0.555744446, 0.8383405055, 1, 1, 1, 1], degree=3))
        make_face()
    extrude(amount=F45_DEPTH)


with BuildPart() as f46:
    # F43 (on Front) → F46 (new body)
    with BuildSketch(Plane.XZ):
        with BuildLine():
            add(Edge.make_bspline(
                [(0, 5.1757181063), (0.33455156, 5.448997402), (1.7246378221, 9.9141937408), (-0.2688630303, 6.773433993), (-0.2244292866, 4.9923924707), (0, 5.1757181063)],
                knots=[0, 0, 0, 0, 0.4103762008, 0.7247048018, 1, 1, 1, 1], degree=3))
        make_face()
    extrude(amount=F46_DEPTH)


solid = Compound([f4.part, f6.part, f8.part, f13.part, f14.part, f15.part, f19.part, f20.part, f21.part, f22.part, f29.part, f30.part, f31.part, f32.part, f33.part, f34.part, f39.part, f40.part, f41.part, f42.part, f45.part, f46.part])
